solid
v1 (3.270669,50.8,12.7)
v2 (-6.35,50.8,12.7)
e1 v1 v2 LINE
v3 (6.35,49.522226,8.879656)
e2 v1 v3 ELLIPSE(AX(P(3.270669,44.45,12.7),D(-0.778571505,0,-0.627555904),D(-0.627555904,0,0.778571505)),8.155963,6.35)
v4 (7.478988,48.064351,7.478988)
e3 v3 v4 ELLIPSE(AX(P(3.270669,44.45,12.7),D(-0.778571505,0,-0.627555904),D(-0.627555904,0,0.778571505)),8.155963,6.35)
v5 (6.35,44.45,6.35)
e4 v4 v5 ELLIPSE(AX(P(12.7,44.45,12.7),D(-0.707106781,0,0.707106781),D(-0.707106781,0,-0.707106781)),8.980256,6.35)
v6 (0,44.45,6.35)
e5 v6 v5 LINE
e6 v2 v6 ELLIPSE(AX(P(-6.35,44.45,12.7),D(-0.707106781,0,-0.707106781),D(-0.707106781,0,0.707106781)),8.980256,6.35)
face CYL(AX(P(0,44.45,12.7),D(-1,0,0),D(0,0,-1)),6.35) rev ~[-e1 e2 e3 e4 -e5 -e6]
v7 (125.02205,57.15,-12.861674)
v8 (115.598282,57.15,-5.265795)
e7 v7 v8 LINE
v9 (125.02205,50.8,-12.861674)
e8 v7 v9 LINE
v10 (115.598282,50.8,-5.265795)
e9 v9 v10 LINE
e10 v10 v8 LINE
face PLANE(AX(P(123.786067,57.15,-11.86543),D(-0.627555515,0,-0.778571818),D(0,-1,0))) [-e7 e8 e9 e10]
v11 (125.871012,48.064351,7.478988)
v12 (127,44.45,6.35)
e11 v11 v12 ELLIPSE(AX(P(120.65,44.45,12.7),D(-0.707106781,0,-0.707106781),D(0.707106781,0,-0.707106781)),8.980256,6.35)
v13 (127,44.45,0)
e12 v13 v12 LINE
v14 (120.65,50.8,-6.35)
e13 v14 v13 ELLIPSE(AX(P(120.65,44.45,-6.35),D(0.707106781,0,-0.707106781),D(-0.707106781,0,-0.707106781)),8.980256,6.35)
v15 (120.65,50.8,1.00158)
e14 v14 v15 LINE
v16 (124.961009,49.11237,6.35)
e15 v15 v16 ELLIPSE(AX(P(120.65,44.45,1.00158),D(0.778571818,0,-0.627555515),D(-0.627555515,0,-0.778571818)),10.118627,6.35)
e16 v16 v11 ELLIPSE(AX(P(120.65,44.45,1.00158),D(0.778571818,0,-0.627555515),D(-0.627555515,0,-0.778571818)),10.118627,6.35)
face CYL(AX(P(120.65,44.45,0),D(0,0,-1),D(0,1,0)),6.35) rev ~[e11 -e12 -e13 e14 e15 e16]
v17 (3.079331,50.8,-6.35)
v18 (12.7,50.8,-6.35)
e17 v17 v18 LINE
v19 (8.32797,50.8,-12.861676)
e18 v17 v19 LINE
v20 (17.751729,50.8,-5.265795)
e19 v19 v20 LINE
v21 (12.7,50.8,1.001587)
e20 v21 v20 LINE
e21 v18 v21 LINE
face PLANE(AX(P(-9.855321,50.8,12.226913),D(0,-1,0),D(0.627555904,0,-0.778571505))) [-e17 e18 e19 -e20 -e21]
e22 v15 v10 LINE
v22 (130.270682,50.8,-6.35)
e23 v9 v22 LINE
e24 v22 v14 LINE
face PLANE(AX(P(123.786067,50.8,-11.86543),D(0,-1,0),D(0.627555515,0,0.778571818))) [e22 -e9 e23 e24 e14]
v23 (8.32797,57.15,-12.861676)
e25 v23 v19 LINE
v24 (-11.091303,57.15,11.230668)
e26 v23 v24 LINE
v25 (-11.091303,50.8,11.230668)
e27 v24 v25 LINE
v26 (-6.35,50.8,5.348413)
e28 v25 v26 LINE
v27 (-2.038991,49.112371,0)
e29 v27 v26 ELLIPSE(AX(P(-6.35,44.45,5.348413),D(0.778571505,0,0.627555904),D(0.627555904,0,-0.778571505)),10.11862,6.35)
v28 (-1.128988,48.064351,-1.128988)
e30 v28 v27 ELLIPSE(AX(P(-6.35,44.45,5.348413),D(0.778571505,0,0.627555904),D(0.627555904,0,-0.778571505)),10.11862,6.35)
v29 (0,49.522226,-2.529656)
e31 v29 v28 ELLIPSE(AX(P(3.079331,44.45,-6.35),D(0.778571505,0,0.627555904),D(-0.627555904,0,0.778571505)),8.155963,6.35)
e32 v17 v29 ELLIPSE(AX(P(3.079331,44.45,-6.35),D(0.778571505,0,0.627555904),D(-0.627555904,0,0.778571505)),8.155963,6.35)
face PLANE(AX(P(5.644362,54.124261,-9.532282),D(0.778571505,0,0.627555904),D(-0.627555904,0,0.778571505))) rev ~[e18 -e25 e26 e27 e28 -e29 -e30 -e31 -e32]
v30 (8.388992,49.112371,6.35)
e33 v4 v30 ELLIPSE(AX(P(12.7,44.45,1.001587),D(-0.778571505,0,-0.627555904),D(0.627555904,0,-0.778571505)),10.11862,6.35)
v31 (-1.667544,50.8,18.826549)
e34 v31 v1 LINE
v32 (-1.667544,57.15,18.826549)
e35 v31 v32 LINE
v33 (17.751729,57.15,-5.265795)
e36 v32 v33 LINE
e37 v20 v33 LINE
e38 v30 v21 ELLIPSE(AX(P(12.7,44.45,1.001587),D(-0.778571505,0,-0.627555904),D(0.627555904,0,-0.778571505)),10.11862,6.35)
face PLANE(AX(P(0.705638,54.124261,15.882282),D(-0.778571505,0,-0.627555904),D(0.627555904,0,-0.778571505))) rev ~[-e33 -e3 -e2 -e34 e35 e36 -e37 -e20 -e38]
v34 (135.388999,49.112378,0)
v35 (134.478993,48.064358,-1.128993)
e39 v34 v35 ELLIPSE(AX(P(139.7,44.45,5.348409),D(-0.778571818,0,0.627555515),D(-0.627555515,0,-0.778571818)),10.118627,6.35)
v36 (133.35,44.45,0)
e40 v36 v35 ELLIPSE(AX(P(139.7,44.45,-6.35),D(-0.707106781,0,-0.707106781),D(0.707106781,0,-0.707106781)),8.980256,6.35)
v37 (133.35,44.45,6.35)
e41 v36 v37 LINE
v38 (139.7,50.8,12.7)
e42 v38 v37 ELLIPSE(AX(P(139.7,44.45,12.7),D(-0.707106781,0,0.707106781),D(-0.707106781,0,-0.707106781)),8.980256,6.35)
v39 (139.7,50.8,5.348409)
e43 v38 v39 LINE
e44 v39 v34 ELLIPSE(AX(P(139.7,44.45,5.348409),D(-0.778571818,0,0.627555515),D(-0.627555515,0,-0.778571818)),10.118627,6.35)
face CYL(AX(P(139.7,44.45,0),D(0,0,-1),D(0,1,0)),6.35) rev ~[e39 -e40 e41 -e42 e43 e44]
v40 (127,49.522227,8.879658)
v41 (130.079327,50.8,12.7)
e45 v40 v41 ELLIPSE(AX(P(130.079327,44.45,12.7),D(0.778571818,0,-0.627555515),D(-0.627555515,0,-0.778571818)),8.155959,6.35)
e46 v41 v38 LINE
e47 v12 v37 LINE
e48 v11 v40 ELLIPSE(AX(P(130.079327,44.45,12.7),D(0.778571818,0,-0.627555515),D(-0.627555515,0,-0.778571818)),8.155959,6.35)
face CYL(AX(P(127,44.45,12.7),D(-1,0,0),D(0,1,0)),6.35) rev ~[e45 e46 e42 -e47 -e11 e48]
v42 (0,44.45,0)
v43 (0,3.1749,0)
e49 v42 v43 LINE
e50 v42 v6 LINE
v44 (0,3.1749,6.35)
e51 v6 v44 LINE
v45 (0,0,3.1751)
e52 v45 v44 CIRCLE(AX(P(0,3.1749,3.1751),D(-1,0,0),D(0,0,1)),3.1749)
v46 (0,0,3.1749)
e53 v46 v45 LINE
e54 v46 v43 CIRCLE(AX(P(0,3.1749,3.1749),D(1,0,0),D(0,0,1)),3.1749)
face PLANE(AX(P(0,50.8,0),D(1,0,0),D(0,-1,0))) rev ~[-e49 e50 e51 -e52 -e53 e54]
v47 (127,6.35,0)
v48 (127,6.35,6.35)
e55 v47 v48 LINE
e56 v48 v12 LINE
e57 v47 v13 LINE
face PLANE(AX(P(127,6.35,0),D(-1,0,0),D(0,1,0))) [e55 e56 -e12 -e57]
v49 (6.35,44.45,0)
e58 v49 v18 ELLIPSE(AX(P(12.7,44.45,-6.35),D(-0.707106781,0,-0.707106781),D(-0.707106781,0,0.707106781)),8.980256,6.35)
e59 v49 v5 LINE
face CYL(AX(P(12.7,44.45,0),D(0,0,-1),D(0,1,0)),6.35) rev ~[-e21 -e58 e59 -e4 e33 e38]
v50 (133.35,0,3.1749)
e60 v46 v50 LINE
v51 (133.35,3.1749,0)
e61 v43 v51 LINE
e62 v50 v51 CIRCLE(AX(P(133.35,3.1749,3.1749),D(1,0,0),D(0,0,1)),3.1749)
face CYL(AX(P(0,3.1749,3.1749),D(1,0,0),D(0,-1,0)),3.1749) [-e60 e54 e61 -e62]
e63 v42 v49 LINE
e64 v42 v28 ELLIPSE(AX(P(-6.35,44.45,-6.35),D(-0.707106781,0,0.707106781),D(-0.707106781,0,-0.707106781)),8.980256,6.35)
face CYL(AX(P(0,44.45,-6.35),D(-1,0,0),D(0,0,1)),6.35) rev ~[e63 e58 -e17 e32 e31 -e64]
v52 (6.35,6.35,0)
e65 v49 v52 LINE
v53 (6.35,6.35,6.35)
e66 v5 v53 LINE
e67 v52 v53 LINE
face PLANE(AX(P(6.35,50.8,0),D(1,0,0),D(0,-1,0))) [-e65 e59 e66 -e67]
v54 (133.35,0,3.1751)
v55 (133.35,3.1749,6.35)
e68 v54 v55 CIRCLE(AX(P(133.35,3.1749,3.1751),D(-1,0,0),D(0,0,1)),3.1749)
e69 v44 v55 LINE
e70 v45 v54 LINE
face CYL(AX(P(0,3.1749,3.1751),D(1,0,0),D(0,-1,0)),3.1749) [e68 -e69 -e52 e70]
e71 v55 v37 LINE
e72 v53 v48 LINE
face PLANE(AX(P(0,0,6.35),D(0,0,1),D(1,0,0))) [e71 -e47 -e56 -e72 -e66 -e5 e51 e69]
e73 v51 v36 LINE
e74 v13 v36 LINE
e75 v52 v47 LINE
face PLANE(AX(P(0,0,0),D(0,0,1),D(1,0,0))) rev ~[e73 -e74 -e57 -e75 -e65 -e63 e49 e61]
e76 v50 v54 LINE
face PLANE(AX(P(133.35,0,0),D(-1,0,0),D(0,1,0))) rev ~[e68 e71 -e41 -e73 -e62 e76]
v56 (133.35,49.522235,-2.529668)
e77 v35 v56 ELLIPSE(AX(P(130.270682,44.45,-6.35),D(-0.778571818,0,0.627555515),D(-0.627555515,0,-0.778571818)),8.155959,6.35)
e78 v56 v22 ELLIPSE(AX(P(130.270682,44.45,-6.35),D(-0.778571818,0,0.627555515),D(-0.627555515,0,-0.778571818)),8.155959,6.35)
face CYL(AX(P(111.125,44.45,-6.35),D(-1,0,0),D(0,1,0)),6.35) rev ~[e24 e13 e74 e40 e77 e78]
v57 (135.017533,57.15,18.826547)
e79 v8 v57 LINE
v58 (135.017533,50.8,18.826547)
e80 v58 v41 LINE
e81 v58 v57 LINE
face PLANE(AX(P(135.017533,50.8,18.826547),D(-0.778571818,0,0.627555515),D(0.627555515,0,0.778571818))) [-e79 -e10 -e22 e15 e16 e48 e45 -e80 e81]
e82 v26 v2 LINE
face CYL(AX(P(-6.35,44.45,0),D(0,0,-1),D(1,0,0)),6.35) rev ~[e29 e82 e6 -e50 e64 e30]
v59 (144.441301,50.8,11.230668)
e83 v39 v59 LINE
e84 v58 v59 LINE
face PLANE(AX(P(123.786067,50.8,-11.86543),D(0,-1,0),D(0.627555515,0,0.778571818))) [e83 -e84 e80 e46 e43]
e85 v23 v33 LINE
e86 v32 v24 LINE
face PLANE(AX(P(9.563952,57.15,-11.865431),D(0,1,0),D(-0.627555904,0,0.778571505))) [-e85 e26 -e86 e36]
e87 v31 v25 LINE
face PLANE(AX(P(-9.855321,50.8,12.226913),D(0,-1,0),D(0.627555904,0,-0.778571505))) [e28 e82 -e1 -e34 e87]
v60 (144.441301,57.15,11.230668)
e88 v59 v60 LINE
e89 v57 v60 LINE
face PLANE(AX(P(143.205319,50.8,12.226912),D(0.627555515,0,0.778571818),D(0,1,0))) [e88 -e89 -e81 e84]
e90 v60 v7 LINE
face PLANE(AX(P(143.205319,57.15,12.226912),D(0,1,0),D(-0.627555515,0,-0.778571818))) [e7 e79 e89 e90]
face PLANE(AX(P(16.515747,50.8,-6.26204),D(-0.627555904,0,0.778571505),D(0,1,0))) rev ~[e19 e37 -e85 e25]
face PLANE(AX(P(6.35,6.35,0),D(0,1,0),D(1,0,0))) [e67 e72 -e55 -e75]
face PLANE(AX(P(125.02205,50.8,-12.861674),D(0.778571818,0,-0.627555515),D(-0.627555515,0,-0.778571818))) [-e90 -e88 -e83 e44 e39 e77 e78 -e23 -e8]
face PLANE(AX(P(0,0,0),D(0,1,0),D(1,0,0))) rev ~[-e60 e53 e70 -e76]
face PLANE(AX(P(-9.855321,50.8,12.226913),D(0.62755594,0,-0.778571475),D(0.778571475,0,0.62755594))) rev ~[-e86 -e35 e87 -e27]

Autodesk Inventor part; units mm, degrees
ref_plane "YZ Plane" through (0, 0, 0) normal (1, 0, 0) x (0, 1, 0)
ref_plane "XZ Plane" through (0, 0, 0) normal (0, 1, 0) x (-1, 0, 0)
ref_plane "XY Plane" through (0, 0, 0) normal (0, 0, 1) x (1, 0, 0)
sketch "Sketch1" plane through (0, 0, 0) normal (0, 0, 1) x (1, 0, 0)
  line L0 (0, 0) -> (133.35, 0)
  line L1 (133.35, 0) -> (133.35, 50.8)
  line L2 (0, 50.8) -> (0, 0)
  line L3 (0, 50.8) -> (6.35, 50.8)
  line L4 (6.35, 50.8) -> (6.35, 6.35)
  line L5 (6.35, 6.35) -> (127, 6.35)
  line L6 (127, 6.35) -> (127, 50.8)
  line L7 (127, 50.8) -> (133.35, 50.8)
  dimension "d1" = 50.8
  dimension "d2" = 6.35
  dimension "d3" = 44.45
  dimension "d4" = 120.65
  dimension "d5" = 133.35
extrude "Extrusion1" add sketch "Sketch1" along normal blind 6.35
fillet "Fillet1" radius 3.175 2 edges at (66.675, 0, 6.35) (66.675, 0, 0)
sketch "Sketch2" plane through (0, 50.8, 0) normal (0, 1, 0) x (1, 0, 0)
  line L0 (6.35, -6.35) -> (16.515747, 6.26204)
  line L1 (-2.903527, -17.830303) -> (6.35, -6.35)
  line L2 (16.515747, 6.26204) -> (9.563953, 11.86543)
  line L3 (9.563953, 11.86543) -> (-9.855321, -12.226913)
  line L4 (-9.855321, -12.226913) -> (-2.903527, -17.830303)
  line L5 (127, 0) -> (127, -6.35)
  line L6 (127, -6.35) -> (143.198942, -6.35) construction
  line L7 (116.834265, 6.26204) -> (123.786067, 11.86543)
  line L8 (123.786067, 11.86543) -> (143.205318, -12.226913)
  line L9 (143.205318, -12.226913) -> (136.253516, -17.830303)
  line L10 (133.35, -6.35) -> (127, -6.35)
  line L11 (116.834265, 6.26204) -> (136.253516, -17.830303)
  point P0 (0, 0)
extrude "Extrusion2" add sketch "Sketch2" along normal blind 6.35
sketch "Sketch6" plane through (16.515747, 50.8, -6.26204) normal (0.7785715, 0, 0.6275559) x (0.6275559, 0, -0.7785715)
  line L0 (-30.944292, 6.35) -> (0, 6.35)
  line L1 (-30.944292, 0) -> (-30.944292, 6.35)
  line L2 (-30.944292, 6.35) -> (-30.944292, 0)
  line L3 (0, 0) -> (0, 6.35)
  line L4 (-30.944292, 0) -> (0, 0)
  line L5 (0, 0) -> (0, 6.35)
  line L6 (0, 6.35) -> (-30.944292, 6.35)
  point P0 (-15.240001, -50.8)
extrude "Extrusion3" add sketch "Sketch6" along normal blind 1.5875
sketch "Sketch7" plane through (-9.855321, 50.8, 12.226913) normal (-0.7785715, 0, -0.6275559) x (-0.6275559, 0, 0.7785715)
  line L0 (-30.944292, 6.35) -> (0, 6.35)
  line L1 (0, 0) -> (-30.944292, 0)
  line L2 (-30.944292, 6.35) -> (-30.944292, 0)
  line L3 (-30.944292, 0) -> (0, 0)
  line L4 (0, 6.35) -> (0, 0)
  line L5 (0, 0) -> (0, 6.35)
  line L6 (0, 6.35) -> (-30.944292, 6.35)
  point P0 (-15.704291, -50.8)
extrude "Extrusion4" add sketch "Sketch7" along normal blind 1.5875
sketch "Sketch8" plane through (136.253516, 50.8, 17.830303) normal (-0.7785718, 0, 0.6275555) x (0.6275555, 0, 0.7785718)
  line L0 (-30.944277, 6.35) -> (0, 6.35)
  line L1 (0, 0) -> (0, 6.35)
  line L2 (-30.944277, 6.35) -> (0, 6.35)
  line L3 (0, 6.35) -> (0, 0)
  line L4 (0, 0) -> (-30.944277, 0)
  line L5 (-30.944277, 0) -> (-30.944277, 6.35)
  line L6 (-30.944277, 0) -> (-30.944277, 6.35)
  point P0 (-99.388813, -50.8)
extrude "Extrusion5" add sketch "Sketch8" along normal blind 1.5875
sketch "Sketch9" plane through (123.786067, 50.8, -11.86543) normal (0.7785718, 0, -0.6275555) x (-0.6275555, 0, -0.7785718)
  line L0 (-30.944277, 6.35) -> (0, 6.35)
  line L1 (-30.944277, 6.35) -> (0, 6.35)
  line L2 (0, 0) -> (-30.944277, 0)
  line L3 (0, 6.35) -> (0, 0)
  line L4 (0, 0) -> (-30.944277, 0)
  line L5 (-30.944277, 0) -> (-30.944277, 6.35)
  point P0 (68.444536, -50.8)
extrude "Extrusion6" add sketch "Sketch9" along normal blind 1.5875
fillet "Fillet4" radius 6.35 8 edges at (133.35, 50.8, 3.175) (130.175, 50.8, 0) (127, 50.8, 3.175) (130.175, 50.8, 6.35) (6.35, 50.8, 3.175) (3.175, 50.8, 6.35) (0, 50.8, 3.175) (3.175, 50.8, 0)
properties part number "landing_3DPrint"
